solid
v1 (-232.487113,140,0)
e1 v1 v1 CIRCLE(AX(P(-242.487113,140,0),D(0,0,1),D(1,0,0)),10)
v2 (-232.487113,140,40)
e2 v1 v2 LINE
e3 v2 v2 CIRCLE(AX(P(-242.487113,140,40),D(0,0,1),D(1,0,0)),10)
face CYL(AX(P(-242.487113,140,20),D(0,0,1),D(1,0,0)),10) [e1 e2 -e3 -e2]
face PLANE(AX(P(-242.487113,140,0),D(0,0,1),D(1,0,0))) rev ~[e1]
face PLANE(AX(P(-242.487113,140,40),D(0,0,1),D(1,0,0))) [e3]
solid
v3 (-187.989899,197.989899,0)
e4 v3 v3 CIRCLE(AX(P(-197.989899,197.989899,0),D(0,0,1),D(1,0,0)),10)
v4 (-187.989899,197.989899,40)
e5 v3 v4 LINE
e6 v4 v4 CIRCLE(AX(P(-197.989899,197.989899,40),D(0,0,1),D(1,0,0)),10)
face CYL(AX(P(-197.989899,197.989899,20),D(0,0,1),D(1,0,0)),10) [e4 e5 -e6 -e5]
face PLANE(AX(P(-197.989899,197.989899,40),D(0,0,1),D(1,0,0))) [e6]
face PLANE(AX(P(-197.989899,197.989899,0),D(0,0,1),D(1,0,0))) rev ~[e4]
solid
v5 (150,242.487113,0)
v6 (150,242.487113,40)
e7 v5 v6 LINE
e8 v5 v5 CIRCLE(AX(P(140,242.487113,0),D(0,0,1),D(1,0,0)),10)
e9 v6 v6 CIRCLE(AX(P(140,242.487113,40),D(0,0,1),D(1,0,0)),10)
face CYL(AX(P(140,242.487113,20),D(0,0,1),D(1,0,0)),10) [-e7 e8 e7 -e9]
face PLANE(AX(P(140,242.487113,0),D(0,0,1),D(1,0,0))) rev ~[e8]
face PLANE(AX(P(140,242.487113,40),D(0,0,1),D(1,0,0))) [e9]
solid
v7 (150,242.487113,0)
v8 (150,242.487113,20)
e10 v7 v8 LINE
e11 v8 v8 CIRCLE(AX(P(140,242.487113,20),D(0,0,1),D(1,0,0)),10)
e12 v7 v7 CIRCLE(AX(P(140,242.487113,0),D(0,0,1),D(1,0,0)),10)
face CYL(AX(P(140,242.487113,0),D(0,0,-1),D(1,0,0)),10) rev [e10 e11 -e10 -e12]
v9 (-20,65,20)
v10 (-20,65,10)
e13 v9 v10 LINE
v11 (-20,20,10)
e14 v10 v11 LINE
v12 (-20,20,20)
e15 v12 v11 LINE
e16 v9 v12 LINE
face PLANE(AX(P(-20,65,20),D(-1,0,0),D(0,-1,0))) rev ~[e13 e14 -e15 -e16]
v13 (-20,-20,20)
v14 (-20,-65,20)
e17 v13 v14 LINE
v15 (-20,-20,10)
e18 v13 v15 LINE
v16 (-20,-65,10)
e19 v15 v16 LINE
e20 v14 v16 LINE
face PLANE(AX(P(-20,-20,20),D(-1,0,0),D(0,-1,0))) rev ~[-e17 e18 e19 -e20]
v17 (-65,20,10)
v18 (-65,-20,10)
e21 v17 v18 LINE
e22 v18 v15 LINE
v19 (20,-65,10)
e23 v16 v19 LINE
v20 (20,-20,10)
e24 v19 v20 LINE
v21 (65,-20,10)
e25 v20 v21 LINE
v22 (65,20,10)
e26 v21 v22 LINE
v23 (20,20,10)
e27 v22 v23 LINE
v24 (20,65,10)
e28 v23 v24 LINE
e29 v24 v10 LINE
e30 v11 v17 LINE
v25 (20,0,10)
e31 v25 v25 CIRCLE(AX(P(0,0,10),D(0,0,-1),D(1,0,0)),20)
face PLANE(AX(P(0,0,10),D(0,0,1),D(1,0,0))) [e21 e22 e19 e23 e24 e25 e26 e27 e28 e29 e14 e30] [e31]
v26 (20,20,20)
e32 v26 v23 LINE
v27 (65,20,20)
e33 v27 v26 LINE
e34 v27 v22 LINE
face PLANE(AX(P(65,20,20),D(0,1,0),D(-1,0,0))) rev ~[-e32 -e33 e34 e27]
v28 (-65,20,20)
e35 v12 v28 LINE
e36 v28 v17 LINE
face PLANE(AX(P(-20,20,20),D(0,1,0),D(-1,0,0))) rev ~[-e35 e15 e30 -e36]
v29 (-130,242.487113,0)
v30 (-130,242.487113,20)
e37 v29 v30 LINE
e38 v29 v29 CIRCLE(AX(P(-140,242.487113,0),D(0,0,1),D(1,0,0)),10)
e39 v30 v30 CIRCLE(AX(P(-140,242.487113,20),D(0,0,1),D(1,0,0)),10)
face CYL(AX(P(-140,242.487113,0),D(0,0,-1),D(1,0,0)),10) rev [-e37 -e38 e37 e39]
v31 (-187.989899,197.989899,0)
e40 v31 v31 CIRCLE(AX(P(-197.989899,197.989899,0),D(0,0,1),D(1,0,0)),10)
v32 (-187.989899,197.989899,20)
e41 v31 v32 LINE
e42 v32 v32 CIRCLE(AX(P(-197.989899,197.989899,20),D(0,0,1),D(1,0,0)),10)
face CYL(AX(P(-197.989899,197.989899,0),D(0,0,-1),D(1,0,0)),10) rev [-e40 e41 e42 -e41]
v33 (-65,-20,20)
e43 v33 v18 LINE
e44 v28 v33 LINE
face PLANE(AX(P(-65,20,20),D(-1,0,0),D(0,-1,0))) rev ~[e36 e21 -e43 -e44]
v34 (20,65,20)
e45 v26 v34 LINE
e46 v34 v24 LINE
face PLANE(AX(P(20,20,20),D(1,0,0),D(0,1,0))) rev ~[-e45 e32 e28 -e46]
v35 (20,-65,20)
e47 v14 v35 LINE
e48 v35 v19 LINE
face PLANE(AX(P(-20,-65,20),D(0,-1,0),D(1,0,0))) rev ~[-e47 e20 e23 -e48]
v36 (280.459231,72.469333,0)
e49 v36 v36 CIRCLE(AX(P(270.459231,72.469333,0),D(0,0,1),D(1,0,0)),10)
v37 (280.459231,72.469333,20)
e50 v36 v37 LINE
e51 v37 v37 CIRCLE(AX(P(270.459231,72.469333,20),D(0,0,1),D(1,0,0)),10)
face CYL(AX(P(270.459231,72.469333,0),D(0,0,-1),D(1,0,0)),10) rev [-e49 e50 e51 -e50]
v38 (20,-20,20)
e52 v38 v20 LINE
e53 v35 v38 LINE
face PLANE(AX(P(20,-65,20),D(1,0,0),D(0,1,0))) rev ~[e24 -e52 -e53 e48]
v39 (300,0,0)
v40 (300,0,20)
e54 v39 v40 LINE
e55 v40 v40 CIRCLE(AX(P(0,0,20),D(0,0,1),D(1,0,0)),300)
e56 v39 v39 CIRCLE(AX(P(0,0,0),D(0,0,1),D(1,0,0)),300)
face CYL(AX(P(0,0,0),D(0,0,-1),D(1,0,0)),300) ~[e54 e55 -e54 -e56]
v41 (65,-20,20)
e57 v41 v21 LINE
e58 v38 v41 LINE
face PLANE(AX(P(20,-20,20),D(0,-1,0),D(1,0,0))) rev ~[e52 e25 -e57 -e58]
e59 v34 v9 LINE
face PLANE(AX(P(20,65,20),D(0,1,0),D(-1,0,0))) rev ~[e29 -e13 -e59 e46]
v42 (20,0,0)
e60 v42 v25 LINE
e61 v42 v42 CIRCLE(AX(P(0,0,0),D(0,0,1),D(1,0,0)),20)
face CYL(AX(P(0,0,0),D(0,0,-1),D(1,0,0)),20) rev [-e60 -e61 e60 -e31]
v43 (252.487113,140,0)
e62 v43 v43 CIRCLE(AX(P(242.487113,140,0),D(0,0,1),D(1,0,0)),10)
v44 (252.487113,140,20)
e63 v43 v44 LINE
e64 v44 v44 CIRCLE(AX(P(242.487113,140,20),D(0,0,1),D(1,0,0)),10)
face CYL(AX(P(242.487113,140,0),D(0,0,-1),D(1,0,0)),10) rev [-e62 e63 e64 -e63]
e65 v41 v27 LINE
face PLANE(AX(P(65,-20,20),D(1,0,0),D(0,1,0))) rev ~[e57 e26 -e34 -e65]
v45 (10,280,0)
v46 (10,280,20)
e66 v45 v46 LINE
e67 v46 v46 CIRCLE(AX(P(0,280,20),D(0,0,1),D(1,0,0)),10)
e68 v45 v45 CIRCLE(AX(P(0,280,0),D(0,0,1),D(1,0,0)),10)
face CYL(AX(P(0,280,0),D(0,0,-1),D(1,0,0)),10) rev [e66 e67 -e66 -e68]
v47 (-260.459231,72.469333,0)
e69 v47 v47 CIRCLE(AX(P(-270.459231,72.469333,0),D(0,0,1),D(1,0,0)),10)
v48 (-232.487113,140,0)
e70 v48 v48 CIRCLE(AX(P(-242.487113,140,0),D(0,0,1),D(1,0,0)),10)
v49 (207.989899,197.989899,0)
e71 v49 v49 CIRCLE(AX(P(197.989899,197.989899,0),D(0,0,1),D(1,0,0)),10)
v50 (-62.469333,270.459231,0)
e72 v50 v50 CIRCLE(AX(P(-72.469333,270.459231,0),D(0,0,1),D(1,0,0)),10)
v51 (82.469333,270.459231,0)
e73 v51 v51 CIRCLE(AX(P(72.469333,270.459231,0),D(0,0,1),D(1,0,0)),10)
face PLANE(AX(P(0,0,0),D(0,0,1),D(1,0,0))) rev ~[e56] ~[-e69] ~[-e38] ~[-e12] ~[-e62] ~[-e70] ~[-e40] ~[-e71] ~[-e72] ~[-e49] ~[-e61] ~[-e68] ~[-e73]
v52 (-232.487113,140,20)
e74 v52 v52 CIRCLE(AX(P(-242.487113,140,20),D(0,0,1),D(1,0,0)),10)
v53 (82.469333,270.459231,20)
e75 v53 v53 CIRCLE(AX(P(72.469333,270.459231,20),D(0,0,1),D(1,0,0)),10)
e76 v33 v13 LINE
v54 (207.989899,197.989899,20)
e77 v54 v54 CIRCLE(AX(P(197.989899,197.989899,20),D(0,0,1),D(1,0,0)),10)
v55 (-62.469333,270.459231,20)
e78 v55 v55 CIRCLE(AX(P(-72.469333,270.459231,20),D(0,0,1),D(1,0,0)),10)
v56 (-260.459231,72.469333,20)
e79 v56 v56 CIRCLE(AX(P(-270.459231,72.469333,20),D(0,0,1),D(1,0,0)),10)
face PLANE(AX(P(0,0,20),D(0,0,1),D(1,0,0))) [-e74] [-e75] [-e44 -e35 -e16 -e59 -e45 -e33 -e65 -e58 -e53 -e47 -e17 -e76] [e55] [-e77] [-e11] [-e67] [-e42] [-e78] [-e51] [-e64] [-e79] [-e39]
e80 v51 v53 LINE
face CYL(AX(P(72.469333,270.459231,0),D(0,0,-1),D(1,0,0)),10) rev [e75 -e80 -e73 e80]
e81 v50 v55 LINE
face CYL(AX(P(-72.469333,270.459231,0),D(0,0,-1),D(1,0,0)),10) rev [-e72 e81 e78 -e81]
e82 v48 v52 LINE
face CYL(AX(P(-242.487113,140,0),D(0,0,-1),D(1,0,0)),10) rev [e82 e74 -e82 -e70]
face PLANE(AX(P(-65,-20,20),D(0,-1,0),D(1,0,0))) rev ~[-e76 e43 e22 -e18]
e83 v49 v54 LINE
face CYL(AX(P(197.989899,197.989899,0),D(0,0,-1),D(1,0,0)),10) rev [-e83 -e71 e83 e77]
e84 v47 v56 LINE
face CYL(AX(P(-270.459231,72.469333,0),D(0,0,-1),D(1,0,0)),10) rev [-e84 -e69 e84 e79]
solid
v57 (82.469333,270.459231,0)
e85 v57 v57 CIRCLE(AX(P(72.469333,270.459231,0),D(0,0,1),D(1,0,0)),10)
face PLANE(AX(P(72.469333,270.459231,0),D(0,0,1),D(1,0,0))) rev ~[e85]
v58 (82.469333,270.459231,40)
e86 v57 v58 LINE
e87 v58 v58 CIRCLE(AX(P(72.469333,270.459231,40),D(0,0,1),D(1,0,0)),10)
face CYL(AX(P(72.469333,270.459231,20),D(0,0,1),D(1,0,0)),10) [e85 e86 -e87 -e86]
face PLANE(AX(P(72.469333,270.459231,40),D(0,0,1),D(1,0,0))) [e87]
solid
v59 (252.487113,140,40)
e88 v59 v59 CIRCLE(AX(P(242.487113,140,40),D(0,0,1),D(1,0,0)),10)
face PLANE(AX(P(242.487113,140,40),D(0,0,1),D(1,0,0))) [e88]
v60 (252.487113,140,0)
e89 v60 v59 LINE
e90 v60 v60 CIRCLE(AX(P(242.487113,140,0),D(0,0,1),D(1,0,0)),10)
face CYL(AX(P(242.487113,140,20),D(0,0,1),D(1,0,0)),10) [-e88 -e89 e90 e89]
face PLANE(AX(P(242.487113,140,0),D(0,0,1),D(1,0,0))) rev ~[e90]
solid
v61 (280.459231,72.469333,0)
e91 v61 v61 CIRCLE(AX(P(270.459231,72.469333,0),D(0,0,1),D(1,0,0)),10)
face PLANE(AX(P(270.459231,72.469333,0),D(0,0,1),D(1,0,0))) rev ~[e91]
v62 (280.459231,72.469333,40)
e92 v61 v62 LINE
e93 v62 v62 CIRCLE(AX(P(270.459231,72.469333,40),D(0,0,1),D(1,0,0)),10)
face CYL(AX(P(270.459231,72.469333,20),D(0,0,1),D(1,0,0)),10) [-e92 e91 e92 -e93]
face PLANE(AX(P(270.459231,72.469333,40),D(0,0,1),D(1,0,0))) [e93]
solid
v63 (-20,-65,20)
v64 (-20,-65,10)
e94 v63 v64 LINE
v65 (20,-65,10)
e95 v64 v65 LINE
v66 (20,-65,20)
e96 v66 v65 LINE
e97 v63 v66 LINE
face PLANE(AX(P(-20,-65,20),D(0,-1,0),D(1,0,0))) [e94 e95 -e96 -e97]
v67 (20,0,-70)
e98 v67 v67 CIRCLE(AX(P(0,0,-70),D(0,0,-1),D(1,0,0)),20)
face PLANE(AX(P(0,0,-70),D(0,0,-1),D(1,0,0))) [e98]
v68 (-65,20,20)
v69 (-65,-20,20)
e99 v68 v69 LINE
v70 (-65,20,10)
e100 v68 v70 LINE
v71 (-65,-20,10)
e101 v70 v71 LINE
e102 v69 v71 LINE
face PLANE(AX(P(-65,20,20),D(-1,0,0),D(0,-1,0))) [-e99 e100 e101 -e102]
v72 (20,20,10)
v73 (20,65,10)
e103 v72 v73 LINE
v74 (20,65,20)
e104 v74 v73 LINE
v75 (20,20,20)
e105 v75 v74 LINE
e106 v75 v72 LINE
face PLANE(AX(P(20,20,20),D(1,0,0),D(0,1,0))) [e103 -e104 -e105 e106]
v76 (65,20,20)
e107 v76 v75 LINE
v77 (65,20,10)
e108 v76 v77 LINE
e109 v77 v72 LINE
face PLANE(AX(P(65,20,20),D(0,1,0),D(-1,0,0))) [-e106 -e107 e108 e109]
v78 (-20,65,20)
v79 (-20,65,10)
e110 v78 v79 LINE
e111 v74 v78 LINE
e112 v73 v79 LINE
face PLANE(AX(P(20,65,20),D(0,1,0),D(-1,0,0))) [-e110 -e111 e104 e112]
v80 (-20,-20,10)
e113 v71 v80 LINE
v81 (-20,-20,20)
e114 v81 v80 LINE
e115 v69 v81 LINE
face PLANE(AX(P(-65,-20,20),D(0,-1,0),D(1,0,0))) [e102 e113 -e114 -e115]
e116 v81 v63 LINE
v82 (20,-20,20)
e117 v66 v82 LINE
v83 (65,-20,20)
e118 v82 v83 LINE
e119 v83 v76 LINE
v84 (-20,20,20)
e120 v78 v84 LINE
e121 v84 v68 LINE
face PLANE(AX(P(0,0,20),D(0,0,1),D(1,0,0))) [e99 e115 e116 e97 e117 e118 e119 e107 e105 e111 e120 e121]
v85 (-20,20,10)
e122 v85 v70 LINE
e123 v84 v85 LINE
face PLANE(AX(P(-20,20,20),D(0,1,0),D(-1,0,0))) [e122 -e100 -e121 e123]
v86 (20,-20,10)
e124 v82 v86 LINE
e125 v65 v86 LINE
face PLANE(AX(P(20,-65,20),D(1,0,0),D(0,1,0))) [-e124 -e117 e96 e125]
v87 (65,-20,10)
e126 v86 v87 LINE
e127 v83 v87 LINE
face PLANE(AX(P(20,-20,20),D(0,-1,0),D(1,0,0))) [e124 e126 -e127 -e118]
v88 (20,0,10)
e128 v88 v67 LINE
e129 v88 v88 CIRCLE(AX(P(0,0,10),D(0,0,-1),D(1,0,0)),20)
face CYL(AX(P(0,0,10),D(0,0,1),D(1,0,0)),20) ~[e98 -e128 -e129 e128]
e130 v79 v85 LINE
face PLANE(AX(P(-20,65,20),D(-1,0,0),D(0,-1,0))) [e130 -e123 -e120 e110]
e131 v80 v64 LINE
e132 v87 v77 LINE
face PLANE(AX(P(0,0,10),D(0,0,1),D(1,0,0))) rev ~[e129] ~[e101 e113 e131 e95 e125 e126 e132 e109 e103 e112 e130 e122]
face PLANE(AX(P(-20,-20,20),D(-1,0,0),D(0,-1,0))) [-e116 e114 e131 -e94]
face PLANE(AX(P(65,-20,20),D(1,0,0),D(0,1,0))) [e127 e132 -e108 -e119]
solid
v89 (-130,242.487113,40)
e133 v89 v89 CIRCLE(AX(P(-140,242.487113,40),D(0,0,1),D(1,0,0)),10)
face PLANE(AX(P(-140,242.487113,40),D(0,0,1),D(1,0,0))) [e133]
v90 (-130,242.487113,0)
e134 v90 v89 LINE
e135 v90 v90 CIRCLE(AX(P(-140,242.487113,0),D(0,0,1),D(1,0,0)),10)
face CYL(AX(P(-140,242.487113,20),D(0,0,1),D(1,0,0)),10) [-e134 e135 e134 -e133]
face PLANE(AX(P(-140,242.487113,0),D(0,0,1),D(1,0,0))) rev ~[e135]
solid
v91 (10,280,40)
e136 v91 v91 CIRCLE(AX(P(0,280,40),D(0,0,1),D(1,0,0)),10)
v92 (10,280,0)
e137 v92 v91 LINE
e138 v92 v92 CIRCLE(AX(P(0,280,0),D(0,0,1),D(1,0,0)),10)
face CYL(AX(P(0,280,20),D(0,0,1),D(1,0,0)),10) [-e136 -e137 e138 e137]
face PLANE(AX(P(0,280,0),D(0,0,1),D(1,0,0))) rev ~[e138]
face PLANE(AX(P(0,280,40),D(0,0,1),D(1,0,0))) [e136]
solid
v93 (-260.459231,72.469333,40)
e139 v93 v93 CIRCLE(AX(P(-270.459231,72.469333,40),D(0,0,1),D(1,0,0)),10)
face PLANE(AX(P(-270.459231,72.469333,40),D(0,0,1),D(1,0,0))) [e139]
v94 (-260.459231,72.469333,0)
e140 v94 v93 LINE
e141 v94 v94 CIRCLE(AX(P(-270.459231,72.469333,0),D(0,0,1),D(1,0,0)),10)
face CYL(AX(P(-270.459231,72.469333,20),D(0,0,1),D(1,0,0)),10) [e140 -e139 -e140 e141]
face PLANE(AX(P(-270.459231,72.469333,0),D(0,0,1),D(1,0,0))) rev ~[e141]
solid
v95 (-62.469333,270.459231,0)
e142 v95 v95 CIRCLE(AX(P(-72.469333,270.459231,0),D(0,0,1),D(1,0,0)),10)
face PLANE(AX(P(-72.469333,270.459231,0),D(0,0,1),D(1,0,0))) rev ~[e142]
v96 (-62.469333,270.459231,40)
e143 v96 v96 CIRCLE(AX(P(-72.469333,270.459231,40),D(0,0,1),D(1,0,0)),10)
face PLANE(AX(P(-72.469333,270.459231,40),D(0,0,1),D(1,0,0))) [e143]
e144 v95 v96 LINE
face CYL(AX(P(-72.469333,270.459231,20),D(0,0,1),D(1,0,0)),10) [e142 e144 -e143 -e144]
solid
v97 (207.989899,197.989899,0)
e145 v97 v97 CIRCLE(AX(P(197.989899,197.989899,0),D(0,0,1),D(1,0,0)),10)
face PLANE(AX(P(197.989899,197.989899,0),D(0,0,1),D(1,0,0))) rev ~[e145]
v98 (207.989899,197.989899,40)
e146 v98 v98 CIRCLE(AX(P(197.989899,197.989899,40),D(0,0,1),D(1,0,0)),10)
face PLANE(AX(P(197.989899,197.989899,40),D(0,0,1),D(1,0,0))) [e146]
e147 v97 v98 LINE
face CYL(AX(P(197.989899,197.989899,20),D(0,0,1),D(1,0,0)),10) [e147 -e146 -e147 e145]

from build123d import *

# Parameters (mm, degrees)
F0_R     = 300
F0_R_2   = 10
F0_R_3   = 20
F1_DEPTH = 20
F2_R     = 10
F3_DEPTH = 20
F5_DEPTH = 10
F7_DEPTH = 10
F8_R     = 20
F9_DEPTH = 80


with BuildPart() as f1:
    # F0 (on Top) → F1 (new body)
    with BuildSketch(Plane.XY):
        Circle(F0_R)
        with Locations((-270.4592313609, 72.4693326287)):
            Circle(F0_R_2, mode=Mode.SUBTRACT)
        with Locations((-242.4871130596, 140)):
            Circle(F0_R_2, mode=Mode.SUBTRACT)
        with Locations((-197.9898987322, 197.9898987322)):
            Circle(F0_R_2, mode=Mode.SUBTRACT)
        with Locations((-140, 242.4871130596)):
            Circle(F0_R_2, mode=Mode.SUBTRACT)
        with Locations((-72.4693326287, 270.4592313609)):
            Circle(F0_R_2, mode=Mode.SUBTRACT)
        Circle(F0_R_3, mode=Mode.SUBTRACT)
        with Locations((270.4592313609, 72.4693326287)):
            Circle(F0_R_2, mode=Mode.SUBTRACT)
        with Locations((242.4871130596, 140)):
            Circle(F0_R_2, mode=Mode.SUBTRACT)
        with Locations((0, 280)):
            Circle(F0_R_2, mode=Mode.SUBTRACT)
        with Locations((72.4693326287, 270.4592313609)):
            Circle(F0_R_2, mode=Mode.SUBTRACT)
        with Locations((140, 242.4871130596)):
            Circle(F0_R_2, mode=Mode.SUBTRACT)
        with Locations((197.9898987322, 197.9898987322)):
            Circle(F0_R_2, mode=Mode.SUBTRACT)
    extrude(amount=F1_DEPTH)

    # F4 (on face) → F5 (cut)
    with BuildSketch(Plane.XY.offset(20)):
        Polygon((-65, 20), (-65, 0), (-65, -20), (-20, -20), (-20, -65), (0, -65), (20, -65), (20, -20), (65, -20), (65, 0), (65, 20), (20, 20), (20, 65), (0, 65), (-20, 65), (-20, 20), align=None)
    extrude(amount=-F5_DEPTH, mode=Mode.SUBTRACT)


with BuildPart() as f3:
    # F2 (on face) → F3 (new body, symmetric)
    with BuildSketch(Plane.XY.offset(20)):
        with Locations((-270.4592313609, 72.4693326287)):
            Circle(F2_R)
    extrude(amount=F3_DEPTH, both=True)


with BuildPart() as f3b:
    # F2 (on face) → F3, piece 2 (new body, symmetric)
    with BuildSketch(Plane.XY.offset(20)):
        with Locations((-242.4871130596, 140)):
            Circle(F2_R)
    extrude(amount=F3_DEPTH, both=True)


with BuildPart() as f3c:
    # F2 (on face) → F3, piece 3 (new body, symmetric)
    with BuildSketch(Plane.XY.offset(20)):
        with Locations((-197.9898987322, 197.9898987322)):
            Circle(F2_R)
    extrude(amount=F3_DEPTH, both=True)


with BuildPart() as f3d:
    # F2 (on face) → F3, piece 4 (new body, symmetric)
    with BuildSketch(Plane.XY.offset(20)):
        with Locations((-140, 242.4871130596)):
            Circle(F2_R)
    extrude(amount=F3_DEPTH, both=True)


with BuildPart() as f3e:
    # F2 (on face) → F3, piece 5 (new body, symmetric)
    with BuildSketch(Plane.XY.offset(20)):
        with Locations((-72.4693326287, 270.4592313609)):
            Circle(F2_R)
    extrude(amount=F3_DEPTH, both=True)


with BuildPart() as f3f:
    # F2 (on face) → F3, piece 6 (new body, symmetric)
    with BuildSketch(Plane.XY.offset(20)):
        with Locations((0, 280)):
            Circle(F2_R)
    extrude(amount=F3_DEPTH, both=True)


with BuildPart() as f3g:
    # F2 (on face) → F3, piece 7 (new body, symmetric)
    with BuildSketch(Plane.XY.offset(20)):
        with Locations((270.4592313609, 72.4693326287)):
            Circle(F2_R)
    extrude(amount=F3_DEPTH, both=True)


with BuildPart() as f3h:
    # F2 (on face) → F3, piece 8 (new body, symmetric)
    with BuildSketch(Plane.XY.offset(20)):
        with Locations((242.4871130596, 140)):
            Circle(F2_R)
    extrude(amount=F3_DEPTH, both=True)


with BuildPart() as f3i:
    # F2 (on face) → F3, piece 9 (new body, symmetric)
    with BuildSketch(Plane.XY.offset(20)):
        with Locations((197.9898987322, 197.9898987322)):
            Circle(F2_R)
    extrude(amount=F3_DEPTH, both=True)


with BuildPart() as f3j:
    # F2 (on face) → F3, piece 10 (new body, symmetric)
    with BuildSketch(Plane.XY.offset(20)):
        with Locations((140, 242.4871130596)):
            Circle(F2_R)
    extrude(amount=F3_DEPTH, both=True)


with BuildPart() as f3k:
    # F2 (on face) → F3, piece 11 (new body, symmetric)
    with BuildSketch(Plane.XY.offset(20)):
        with Locations((72.4693326287, 270.4592313609)):
            Circle(F2_R)
    extrude(amount=F3_DEPTH, both=True)


with BuildPart() as f7:
    # F6 (on face) → F7 (new body)
    with BuildSketch(Plane.XY.offset(20)):
        Polygon((-65, 20), (-65, -20), (-20, -20), (-20, -65), (20, -65), (20, -20), (65, -20), (65, 20), (20, 20), (20, 65), (-20, 65), (-20, 20), align=None)
    extrude(amount=-F7_DEPTH)

    # F8 (on face) → F9 (join)
    with BuildSketch(Plane(origin=(0, 0, 10), x_dir=(1, 0, 0), z_dir=(0, 0, -1))):
        Circle(F8_R)
    extrude(amount=F9_DEPTH)


solid = Compound([f1.part, f3.part, f3b.part, f3c.part, f3d.part, f3e.part, f3f.part, f3g.part, f3h.part, f3i.part, f3j.part, f3k.part, f7.part])
